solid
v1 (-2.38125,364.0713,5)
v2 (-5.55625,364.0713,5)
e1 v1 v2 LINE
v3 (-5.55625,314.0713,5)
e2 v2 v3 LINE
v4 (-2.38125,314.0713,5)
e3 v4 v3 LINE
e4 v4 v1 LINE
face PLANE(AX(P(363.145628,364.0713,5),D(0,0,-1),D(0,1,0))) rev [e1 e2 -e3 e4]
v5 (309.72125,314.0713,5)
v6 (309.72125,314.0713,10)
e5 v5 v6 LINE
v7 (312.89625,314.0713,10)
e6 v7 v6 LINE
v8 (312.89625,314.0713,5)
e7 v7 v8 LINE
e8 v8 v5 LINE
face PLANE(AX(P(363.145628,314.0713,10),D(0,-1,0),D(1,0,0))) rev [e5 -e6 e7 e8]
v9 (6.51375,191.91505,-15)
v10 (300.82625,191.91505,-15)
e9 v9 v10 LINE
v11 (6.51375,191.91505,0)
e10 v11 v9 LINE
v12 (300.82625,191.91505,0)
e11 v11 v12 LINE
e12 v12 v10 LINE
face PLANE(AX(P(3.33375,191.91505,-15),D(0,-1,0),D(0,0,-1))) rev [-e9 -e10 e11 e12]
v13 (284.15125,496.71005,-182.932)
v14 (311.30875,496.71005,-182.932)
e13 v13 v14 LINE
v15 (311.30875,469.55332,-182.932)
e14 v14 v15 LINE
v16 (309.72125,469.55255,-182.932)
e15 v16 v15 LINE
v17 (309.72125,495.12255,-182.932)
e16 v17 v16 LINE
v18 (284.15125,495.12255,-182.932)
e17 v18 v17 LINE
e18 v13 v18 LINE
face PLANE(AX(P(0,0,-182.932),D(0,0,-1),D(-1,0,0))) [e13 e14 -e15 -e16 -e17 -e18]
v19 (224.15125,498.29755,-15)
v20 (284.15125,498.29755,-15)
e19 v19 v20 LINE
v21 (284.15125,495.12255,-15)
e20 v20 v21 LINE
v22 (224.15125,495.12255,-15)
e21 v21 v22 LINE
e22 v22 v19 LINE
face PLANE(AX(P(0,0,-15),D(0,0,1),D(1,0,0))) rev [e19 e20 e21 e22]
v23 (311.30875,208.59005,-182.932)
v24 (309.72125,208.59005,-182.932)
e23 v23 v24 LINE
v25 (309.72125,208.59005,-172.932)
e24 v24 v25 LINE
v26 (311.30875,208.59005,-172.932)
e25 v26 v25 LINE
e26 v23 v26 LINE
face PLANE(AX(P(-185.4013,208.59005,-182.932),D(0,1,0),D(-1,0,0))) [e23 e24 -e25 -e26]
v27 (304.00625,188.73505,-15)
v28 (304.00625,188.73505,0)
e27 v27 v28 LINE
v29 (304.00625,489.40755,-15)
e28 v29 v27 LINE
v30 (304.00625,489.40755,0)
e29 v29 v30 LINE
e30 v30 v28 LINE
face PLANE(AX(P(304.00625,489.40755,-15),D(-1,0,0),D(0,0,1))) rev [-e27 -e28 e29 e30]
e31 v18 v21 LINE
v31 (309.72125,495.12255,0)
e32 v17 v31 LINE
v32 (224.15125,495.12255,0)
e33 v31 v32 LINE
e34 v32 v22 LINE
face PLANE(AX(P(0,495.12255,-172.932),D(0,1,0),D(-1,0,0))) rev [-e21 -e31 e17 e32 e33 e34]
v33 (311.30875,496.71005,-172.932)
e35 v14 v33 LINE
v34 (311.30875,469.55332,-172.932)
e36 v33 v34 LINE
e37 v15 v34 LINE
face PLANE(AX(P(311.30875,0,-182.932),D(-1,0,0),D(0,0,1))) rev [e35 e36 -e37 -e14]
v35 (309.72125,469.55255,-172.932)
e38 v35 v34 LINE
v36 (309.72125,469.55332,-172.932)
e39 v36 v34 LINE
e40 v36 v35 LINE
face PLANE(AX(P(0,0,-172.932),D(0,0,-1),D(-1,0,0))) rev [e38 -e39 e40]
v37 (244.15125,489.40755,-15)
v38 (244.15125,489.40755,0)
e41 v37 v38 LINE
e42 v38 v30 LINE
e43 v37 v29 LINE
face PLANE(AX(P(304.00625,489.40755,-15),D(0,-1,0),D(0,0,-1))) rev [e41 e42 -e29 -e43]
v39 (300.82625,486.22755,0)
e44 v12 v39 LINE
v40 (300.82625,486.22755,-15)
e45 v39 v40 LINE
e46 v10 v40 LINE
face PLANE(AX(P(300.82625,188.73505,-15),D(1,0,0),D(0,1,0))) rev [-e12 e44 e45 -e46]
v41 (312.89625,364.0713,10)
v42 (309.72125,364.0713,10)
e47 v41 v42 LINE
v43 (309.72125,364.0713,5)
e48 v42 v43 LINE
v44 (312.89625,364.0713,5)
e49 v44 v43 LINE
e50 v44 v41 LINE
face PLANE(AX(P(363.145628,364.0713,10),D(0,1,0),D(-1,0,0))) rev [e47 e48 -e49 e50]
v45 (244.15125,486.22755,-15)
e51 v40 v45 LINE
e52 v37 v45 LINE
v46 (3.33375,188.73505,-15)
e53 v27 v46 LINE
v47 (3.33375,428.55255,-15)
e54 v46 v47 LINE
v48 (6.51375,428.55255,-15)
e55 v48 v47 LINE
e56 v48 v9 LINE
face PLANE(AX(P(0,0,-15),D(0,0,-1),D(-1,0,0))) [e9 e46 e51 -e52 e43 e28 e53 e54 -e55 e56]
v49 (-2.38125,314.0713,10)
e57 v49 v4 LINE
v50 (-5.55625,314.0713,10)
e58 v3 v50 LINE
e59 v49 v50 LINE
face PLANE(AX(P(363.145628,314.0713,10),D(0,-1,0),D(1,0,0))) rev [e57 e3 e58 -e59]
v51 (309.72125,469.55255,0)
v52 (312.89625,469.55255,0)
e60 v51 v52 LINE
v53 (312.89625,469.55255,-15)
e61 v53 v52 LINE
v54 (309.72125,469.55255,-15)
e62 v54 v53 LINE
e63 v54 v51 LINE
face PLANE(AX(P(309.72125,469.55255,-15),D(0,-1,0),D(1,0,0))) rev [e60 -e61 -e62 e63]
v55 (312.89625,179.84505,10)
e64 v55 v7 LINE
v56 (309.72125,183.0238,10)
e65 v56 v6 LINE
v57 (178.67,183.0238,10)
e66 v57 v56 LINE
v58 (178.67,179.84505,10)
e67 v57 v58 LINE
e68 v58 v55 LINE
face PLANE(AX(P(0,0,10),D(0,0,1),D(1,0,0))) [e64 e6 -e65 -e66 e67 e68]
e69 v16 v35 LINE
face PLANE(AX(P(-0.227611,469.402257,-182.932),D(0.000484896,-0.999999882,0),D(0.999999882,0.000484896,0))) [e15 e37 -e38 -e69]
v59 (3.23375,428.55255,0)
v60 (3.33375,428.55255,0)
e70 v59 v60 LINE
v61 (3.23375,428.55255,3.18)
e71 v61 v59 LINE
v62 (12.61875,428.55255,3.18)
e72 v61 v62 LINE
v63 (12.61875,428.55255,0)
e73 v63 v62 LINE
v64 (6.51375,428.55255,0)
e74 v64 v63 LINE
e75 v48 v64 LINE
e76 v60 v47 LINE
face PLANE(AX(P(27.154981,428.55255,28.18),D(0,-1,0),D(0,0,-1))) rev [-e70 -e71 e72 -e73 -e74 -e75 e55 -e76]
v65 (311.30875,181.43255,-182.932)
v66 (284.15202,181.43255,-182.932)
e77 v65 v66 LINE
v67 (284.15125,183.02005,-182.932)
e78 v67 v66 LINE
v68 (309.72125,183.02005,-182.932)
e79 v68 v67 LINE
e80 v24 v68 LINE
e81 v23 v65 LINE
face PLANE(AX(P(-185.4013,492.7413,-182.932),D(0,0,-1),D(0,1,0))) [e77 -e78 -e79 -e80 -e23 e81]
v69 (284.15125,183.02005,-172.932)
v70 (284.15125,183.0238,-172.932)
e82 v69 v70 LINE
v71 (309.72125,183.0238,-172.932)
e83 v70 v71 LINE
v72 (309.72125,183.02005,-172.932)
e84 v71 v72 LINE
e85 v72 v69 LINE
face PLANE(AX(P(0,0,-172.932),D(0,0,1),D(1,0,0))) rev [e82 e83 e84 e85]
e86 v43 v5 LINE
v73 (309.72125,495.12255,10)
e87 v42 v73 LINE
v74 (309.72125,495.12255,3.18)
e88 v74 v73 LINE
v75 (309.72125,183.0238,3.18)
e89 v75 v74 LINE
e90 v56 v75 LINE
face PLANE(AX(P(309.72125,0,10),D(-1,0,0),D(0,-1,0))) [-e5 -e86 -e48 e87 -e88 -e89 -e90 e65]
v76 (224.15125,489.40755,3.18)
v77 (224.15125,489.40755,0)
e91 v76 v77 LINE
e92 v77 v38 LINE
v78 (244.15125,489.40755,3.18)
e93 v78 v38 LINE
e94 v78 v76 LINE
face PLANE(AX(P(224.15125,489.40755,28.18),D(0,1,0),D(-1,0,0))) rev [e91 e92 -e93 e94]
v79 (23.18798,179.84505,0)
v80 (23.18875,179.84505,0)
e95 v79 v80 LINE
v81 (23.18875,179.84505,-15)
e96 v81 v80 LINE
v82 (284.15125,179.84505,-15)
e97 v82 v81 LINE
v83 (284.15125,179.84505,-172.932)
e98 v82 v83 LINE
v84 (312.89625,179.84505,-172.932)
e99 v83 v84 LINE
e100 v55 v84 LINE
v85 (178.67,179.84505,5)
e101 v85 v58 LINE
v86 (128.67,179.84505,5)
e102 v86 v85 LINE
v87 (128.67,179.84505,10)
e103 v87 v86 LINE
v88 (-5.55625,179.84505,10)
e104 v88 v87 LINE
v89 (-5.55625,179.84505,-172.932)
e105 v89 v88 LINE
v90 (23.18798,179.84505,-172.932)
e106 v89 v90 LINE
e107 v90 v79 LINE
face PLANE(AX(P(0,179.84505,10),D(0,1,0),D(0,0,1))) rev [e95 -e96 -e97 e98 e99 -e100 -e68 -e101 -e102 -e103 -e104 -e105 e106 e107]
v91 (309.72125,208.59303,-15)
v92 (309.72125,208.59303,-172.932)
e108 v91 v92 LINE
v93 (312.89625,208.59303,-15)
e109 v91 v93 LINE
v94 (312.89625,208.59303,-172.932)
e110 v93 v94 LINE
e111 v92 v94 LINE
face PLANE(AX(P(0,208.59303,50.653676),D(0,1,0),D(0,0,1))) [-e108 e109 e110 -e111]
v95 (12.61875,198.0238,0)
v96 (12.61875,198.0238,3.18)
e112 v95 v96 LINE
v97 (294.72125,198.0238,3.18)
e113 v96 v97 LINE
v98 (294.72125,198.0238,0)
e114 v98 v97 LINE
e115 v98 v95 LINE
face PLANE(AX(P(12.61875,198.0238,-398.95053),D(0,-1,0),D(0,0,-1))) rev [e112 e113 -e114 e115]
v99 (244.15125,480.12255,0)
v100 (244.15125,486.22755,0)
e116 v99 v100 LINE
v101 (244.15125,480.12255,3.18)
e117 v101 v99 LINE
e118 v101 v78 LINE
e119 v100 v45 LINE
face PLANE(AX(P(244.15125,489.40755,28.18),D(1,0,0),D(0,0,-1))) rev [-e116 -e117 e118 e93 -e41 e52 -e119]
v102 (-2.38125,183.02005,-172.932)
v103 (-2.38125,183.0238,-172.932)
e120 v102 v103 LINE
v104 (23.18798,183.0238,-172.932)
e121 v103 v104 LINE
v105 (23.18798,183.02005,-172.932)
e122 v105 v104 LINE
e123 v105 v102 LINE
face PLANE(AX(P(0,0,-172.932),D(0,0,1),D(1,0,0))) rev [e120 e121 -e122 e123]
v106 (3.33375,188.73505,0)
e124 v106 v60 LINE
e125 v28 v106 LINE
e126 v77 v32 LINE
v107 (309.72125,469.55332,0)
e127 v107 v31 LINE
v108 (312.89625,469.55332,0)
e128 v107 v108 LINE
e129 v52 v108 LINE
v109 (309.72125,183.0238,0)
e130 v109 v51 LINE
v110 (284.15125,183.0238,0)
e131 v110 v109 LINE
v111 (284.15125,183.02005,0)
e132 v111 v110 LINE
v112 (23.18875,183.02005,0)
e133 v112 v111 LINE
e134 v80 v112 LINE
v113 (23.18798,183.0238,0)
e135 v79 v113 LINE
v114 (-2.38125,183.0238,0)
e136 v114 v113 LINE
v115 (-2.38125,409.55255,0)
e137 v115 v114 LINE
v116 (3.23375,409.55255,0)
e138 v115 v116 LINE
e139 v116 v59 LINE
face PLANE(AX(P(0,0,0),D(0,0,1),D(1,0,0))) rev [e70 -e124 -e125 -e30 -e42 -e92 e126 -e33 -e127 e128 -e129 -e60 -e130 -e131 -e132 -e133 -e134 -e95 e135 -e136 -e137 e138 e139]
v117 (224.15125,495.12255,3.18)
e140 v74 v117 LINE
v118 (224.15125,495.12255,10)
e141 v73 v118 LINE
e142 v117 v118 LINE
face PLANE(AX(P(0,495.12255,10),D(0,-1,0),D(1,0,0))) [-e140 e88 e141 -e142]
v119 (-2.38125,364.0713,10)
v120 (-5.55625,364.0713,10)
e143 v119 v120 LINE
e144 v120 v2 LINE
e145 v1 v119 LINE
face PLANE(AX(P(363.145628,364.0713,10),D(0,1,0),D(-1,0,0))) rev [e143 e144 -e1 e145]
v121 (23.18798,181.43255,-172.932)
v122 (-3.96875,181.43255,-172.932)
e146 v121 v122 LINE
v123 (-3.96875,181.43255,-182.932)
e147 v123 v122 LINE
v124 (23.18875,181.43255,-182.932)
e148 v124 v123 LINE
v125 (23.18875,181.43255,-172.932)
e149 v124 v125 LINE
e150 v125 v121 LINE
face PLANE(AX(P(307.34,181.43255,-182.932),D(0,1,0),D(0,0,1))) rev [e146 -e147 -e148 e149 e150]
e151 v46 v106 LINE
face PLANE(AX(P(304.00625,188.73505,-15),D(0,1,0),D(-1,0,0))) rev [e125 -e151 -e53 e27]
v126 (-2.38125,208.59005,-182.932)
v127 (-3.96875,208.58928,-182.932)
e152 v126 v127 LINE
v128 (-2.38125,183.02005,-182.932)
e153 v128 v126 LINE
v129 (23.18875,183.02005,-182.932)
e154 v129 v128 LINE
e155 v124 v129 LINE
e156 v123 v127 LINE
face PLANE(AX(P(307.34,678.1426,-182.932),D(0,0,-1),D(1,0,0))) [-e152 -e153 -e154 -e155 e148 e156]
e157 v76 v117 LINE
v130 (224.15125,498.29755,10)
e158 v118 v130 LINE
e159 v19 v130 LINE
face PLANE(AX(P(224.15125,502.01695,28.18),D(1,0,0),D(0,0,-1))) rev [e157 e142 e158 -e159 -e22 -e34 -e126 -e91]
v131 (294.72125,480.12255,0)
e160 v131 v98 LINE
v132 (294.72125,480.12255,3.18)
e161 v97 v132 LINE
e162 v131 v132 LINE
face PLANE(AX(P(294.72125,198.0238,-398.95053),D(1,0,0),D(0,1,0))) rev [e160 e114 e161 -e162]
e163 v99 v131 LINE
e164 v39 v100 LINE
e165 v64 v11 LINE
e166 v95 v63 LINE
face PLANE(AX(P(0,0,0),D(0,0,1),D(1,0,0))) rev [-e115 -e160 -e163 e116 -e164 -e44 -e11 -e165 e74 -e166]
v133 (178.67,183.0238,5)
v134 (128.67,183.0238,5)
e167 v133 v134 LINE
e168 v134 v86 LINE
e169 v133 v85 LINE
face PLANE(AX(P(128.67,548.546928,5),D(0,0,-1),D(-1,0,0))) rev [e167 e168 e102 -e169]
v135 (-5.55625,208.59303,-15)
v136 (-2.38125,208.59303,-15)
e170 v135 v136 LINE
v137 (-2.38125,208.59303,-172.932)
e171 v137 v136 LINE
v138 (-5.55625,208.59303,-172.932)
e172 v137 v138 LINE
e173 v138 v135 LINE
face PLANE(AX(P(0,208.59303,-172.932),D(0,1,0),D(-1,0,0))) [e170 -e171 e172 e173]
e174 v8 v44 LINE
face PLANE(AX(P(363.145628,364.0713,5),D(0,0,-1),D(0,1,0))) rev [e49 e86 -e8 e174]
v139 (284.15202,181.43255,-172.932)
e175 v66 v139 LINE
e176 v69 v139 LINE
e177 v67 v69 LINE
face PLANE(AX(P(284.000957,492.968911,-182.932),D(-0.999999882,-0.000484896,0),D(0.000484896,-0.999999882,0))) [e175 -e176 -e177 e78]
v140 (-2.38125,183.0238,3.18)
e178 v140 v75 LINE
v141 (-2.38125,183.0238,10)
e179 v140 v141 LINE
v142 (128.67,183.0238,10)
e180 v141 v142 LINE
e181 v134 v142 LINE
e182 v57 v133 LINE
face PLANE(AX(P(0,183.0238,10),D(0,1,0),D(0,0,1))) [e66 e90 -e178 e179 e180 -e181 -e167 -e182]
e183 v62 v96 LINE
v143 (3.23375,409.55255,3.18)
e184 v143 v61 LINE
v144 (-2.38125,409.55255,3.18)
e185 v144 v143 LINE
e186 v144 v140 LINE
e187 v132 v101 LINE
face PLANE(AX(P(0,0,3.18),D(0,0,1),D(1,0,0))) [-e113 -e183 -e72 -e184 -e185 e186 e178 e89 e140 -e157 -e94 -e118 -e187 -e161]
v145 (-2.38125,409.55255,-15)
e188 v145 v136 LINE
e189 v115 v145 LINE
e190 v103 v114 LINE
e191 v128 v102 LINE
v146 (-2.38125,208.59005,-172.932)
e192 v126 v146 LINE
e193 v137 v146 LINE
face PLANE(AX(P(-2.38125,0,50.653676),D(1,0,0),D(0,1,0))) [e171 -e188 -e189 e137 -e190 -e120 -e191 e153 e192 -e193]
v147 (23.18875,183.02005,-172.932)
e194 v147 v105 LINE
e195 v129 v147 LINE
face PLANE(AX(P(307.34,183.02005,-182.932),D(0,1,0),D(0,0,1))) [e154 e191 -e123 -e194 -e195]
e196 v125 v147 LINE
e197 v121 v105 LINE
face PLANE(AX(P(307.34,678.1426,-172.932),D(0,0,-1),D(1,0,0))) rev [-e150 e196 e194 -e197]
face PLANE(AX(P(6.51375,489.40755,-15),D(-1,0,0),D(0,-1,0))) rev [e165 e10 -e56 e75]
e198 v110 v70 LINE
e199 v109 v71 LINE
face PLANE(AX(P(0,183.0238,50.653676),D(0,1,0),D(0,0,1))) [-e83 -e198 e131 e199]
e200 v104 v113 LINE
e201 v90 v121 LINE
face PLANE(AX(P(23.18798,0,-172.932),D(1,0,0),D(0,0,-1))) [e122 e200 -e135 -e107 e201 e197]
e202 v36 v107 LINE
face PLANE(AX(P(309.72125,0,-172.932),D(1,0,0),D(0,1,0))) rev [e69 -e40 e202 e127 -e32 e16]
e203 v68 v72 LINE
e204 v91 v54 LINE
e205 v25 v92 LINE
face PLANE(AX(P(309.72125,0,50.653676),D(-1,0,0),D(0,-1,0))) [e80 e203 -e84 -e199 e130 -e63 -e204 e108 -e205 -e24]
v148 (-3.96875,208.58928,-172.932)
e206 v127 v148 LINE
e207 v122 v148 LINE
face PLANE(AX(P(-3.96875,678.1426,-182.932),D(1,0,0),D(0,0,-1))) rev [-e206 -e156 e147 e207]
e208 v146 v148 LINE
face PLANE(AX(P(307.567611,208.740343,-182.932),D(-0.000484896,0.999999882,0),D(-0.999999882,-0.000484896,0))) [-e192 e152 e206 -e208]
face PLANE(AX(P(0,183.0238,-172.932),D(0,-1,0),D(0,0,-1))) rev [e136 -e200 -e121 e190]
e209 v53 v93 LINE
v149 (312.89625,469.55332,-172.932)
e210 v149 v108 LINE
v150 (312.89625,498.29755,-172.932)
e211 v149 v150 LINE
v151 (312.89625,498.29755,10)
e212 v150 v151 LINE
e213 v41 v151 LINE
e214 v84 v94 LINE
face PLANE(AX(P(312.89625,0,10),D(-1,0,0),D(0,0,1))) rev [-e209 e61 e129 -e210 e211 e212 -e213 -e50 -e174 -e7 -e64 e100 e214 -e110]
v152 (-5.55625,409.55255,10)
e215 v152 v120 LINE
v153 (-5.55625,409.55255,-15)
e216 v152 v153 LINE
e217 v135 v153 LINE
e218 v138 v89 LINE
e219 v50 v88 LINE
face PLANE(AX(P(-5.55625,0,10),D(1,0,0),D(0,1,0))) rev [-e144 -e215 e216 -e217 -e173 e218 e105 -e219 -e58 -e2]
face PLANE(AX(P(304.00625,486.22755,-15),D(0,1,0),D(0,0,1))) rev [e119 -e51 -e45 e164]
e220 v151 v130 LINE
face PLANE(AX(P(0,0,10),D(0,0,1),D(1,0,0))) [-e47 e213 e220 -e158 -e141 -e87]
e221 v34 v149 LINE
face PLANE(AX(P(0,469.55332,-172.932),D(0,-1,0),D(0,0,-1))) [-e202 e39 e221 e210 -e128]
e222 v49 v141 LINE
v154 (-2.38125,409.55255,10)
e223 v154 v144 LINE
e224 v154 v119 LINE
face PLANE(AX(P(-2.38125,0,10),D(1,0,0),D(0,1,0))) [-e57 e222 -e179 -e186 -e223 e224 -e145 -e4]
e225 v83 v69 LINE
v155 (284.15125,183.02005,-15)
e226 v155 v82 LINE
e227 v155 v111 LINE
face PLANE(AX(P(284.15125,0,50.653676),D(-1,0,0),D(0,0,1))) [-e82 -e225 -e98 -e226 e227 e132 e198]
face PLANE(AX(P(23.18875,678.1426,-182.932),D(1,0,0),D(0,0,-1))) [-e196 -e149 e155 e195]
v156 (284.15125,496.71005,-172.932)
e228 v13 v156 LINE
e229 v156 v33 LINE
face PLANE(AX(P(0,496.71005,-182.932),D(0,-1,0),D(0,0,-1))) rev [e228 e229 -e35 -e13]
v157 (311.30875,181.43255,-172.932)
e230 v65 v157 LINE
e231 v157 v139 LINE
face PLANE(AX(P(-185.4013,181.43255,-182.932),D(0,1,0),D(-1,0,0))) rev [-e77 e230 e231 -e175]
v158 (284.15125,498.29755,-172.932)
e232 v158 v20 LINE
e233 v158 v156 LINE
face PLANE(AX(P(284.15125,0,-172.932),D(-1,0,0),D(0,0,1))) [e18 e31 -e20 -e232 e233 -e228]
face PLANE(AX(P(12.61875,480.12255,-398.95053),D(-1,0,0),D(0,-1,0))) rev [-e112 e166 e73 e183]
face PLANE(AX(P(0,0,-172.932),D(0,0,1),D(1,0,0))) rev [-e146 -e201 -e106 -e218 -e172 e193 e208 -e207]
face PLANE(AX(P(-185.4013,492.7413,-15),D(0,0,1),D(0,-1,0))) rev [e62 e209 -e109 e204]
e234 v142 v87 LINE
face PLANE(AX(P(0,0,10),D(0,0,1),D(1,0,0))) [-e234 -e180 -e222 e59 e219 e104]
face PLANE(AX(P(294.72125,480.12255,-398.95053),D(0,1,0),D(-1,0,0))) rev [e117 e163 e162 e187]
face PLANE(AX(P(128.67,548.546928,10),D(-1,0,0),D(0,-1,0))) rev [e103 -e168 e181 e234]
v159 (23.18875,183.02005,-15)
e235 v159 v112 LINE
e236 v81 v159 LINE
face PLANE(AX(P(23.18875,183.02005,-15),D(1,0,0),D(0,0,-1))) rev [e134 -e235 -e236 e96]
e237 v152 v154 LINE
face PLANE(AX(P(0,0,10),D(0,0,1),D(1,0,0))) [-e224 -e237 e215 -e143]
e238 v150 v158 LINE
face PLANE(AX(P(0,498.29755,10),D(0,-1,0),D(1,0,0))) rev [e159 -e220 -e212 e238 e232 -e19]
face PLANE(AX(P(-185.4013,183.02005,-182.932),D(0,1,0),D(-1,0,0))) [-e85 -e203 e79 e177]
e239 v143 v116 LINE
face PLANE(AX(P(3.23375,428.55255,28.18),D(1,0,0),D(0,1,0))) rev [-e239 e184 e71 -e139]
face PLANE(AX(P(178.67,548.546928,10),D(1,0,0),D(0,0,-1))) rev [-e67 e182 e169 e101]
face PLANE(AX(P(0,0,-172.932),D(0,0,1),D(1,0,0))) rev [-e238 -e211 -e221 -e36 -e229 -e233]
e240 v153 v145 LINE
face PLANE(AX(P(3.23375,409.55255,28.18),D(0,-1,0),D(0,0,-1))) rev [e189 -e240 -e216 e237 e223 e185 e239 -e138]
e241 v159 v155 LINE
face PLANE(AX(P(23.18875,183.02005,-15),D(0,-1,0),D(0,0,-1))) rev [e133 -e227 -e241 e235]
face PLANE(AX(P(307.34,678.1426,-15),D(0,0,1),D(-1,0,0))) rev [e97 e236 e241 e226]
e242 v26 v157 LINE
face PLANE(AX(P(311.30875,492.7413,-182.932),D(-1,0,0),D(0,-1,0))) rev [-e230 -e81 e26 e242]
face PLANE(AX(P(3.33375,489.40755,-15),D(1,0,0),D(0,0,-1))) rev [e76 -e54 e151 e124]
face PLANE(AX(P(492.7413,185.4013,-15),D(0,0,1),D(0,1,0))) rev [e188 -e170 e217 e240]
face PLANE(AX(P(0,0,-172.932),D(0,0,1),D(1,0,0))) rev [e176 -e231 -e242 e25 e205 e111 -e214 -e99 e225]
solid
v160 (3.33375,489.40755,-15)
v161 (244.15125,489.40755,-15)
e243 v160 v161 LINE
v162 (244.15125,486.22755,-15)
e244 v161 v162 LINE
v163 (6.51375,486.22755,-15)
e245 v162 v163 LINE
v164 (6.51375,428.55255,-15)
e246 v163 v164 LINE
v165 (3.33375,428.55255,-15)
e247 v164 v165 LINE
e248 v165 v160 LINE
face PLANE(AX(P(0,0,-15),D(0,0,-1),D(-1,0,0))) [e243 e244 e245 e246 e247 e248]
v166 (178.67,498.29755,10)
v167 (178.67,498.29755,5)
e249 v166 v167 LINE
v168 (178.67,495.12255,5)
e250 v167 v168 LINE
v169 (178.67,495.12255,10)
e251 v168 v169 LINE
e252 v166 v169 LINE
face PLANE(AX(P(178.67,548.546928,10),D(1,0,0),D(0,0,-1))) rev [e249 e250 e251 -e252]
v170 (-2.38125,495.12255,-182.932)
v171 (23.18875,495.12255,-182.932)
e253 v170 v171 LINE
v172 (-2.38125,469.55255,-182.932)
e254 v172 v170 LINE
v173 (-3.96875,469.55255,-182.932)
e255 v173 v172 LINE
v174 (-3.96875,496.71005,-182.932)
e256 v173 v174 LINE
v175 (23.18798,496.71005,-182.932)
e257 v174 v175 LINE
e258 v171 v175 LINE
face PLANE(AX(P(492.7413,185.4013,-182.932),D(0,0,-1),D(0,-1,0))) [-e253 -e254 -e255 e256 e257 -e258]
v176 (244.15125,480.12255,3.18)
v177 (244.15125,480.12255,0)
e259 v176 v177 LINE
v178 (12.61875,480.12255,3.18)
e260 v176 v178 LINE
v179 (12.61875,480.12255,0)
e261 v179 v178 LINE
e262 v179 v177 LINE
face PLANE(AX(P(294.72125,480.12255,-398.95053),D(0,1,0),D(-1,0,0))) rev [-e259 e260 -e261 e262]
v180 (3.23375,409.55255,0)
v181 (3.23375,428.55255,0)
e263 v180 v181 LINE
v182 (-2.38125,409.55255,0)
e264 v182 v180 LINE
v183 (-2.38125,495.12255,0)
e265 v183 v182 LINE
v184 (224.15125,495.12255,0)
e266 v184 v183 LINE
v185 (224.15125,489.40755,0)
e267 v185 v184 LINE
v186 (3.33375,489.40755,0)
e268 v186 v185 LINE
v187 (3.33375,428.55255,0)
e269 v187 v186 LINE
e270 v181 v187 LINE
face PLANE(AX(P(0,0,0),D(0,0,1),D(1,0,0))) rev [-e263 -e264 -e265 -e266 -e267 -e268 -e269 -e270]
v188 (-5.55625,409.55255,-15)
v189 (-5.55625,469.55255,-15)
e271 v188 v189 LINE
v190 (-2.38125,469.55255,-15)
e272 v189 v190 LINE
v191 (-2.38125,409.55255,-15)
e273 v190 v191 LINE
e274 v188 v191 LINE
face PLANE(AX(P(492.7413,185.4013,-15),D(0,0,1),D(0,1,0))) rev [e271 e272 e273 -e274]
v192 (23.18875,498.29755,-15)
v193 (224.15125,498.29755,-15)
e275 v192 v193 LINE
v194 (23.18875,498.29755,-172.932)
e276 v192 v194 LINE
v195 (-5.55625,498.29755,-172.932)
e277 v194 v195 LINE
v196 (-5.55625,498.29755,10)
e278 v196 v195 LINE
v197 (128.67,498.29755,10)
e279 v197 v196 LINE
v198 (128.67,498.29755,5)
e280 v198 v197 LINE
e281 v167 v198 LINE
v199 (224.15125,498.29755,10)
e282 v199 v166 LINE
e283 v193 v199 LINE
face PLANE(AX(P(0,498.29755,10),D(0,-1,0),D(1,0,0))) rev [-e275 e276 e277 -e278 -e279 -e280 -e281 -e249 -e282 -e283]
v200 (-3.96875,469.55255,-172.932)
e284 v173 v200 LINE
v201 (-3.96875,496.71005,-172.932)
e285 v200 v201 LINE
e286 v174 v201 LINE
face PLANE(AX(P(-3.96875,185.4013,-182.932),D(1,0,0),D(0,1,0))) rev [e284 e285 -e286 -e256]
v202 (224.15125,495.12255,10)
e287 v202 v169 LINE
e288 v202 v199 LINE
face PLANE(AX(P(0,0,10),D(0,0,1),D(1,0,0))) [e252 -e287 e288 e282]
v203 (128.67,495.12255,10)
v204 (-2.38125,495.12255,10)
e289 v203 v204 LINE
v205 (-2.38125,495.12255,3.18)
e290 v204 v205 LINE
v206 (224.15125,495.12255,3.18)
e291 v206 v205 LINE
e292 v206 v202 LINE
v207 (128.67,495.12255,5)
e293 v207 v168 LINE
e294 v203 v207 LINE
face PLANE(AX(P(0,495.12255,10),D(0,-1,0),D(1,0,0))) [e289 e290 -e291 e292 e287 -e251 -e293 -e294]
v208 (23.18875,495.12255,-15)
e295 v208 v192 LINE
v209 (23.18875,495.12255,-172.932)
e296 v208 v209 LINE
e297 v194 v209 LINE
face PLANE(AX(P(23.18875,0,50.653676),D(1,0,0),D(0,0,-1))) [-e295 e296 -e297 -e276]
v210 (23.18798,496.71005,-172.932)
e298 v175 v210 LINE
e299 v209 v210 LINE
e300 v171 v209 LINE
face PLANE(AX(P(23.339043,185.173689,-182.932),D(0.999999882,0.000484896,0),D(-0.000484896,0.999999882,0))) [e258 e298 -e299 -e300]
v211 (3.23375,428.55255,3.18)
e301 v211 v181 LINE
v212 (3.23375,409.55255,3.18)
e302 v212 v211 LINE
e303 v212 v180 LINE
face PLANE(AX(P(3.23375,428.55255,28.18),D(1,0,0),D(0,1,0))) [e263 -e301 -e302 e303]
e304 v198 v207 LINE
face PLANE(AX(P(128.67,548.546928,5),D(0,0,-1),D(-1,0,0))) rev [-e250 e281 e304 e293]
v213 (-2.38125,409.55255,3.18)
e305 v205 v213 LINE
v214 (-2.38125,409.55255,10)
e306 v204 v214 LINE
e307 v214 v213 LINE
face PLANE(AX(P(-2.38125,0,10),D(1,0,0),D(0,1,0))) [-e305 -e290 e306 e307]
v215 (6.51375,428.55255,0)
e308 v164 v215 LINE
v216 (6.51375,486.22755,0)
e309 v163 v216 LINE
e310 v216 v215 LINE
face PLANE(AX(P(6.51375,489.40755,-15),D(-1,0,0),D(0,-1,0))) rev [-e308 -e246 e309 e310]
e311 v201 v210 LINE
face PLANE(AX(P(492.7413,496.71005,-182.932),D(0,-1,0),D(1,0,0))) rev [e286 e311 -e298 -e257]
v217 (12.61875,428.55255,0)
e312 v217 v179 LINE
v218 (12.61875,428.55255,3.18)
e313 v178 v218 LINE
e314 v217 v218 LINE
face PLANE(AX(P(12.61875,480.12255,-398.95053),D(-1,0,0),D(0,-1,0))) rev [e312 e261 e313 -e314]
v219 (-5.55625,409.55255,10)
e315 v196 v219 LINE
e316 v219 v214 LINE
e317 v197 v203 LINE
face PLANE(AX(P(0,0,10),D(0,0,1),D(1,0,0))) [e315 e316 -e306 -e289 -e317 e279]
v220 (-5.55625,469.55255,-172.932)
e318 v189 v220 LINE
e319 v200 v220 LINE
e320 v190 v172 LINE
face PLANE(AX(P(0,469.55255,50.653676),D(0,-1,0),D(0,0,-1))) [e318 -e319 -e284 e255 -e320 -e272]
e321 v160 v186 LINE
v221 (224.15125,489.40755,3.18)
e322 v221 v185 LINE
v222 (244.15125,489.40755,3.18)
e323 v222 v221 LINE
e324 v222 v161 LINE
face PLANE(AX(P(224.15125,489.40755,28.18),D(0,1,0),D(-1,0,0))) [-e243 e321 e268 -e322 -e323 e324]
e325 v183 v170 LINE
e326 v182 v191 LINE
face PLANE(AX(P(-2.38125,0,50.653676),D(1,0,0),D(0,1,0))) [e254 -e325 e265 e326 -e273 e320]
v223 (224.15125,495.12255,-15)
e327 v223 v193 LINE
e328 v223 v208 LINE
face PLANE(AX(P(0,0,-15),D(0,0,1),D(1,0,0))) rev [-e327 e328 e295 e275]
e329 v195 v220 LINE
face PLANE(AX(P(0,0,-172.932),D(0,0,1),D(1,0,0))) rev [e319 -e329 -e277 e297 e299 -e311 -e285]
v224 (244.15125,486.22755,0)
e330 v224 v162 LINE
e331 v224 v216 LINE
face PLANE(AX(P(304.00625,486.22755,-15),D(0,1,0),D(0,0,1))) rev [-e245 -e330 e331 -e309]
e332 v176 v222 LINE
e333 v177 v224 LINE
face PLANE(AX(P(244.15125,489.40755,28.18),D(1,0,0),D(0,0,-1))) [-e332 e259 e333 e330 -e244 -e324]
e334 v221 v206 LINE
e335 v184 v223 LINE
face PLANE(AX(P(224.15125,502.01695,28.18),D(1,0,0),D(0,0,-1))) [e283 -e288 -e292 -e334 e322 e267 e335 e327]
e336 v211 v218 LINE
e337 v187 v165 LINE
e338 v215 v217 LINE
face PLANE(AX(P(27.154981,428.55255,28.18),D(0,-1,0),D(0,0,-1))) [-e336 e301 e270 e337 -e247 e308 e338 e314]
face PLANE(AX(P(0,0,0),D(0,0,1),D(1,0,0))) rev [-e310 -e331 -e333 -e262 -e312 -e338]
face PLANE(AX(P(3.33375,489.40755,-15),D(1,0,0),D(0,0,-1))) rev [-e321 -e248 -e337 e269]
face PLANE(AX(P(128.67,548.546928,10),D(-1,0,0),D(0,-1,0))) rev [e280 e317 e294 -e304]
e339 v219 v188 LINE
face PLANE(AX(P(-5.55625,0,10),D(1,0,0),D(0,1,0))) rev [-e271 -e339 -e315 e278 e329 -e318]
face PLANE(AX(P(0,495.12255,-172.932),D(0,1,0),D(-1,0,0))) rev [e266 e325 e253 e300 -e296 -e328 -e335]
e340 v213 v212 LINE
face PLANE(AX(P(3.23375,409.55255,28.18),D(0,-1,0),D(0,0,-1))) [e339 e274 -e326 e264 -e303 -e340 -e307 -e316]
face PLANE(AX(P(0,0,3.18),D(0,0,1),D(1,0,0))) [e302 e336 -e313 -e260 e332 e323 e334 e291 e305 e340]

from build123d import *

# Parameters (mm, degrees)
SKETCH1_W                = 260.9625
SKETCH1_H                = 3.175
BOSS_EXTRUDE1_DEPTH      = 10
SKETCH1_W_2              = 3.175
SKETCH1_H_2              = 260.959519773
BOSS_EXTRUDE1_2_DEPTH    = 10
SKETCH1_H_3              = 260.960289546
BOSS_EXTRUDE1_3_DEPTH    = 10
SKETCH1_W_3              = 260.963269773
SKETCH1_H_4              = 3.17875
BOSS_EXTRUDE1_4_DEPTH    = 10
SKETCH1_2_W              = 312.1025
SKETCH1_2_H              = 312.09875
BOSS_EXTRUDE2_DEPTH      = 3.18
BOSS_EXTRUDE4_DEPTH      = 10
BOSS_EXTRUDE4_DEPTH_BACK = 172.932
SKETCH2_W                = 282.1025
SKETCH2_H                = 282.09875
CUT_EXTRUDE1_DEPTH       = 3.18
CUT_EXTRUDE2_START       = -318.4525
SKETCH4_W                = 5
SKETCH4_H                = 50
CUT_EXTRUDE2_DEPTH       = 318.4525
CUT_EXTRUDE3_START       = -318.4525
SKETCH5_W                = 50
SKETCH5_H                = 5
CUT_EXTRUDE3_DEPTH       = 318.4525
SKETCH6_W                = 300.6725
SKETCH6_H                = 3.18
SKETCH6_W_2              = 260.9625
SKETCH6_H_2              = 3.175
BOSS_EXTRUDE5_DEPTH      = 15
CIRPATTERN11_COUNT       = 4
BOSS_EXTRUDE9_DEPTH      = 10
CIRPATTERN16_COUNT       = 4
SPLIT1_START             = -15
SPLIT1_DEPTH             = 18.18
SPLIT1_START_2           = -172.932
SPLIT1_2_DEPTH           = 182.932
SPLIT1_3_DEPTH           = 3.18
SPLIT1_START_3           = 3.18
SPLIT1_4_OUTLINE_W       = 45.48125
SPLIT1_4_OUTLINE_H       = 3.175
SPLIT1_4_OUTLINE_W_2     = 105.48125
SPLIT1_4_OUTLINE_W_3     = 3.175
SPLIT1_4_OUTLINE_H_2     = 60
SPLIT1_4_DEPTH           = 6.82
SPLIT1_START_4           = -182.932
SPLIT1_5_DEPTH           = 10
SPLIT1_6_OUTLINE_W       = 50
SPLIT1_6_OUTLINE_H       = 3.175
SPLIT1_6_DEPTH           = 1.82
SPLIT1_START_5           = -5.55625
SPLIT1_7_DEPTH           = 249.7075
SPLIT1_8_DEPTH           = 229.7075
SPLIT1_9_OUTLINE_W       = 19
SPLIT1_9_OUTLINE_H       = 18.18
SPLIT1_9_DEPTH           = 8.79


# Read off the part's stored shape, not the designer's step: Split1
with BuildPart() as part:
    # Sketch1 → Boss-Extrude1 (new body)
    with BuildSketch(Plane.XY):
        with Locations((153.67, 496.71005)):
            Rectangle(SKETCH1_W, SKETCH1_H)
    extrude(amount=BOSS_EXTRUDE1_DEPTH)



with BuildPart() as body_2:
    # Sketch1 → Boss-Extrude1 2 (new body)
    with BuildSketch(Plane.XY):
        with Locations((-3.96875, 339.072790114)):
            Rectangle(SKETCH1_W_2, SKETCH1_H_2)
    extrude(amount=BOSS_EXTRUDE1_2_DEPTH)


with BuildPart() as body_3:
    # Sketch1 → Boss-Extrude1 3 (new body)
    with BuildSketch(Plane.XY):
        with Locations((311.30875, 339.073175)):
            Rectangle(SKETCH1_W_2, SKETCH1_H_3)
    extrude(amount=BOSS_EXTRUDE1_3_DEPTH)


with BuildPart() as body_4:
    # Sketch1 → Boss-Extrude1 4 (new body)
    with BuildSketch(Plane.XY):
        with Locations((153.669615114, 181.434425)):
            Rectangle(SKETCH1_W_3, SKETCH1_H_4)
    extrude(amount=BOSS_EXTRUDE1_4_DEPTH)


with BuildPart() as part_1:
    add(part.part)

    add(body_2.part)  # Boss-Extrude2 merges body 2

    add(body_3.part)  # Boss-Extrude2 merges body 3

    add(body_4.part)  # Boss-Extrude2 merges body 4
    # Sketch1<2> → Boss-Extrude2 (add)
    with BuildSketch(Plane.XY):
        with Locations((153.67, 339.073175)):
            Rectangle(SKETCH1_2_W, SKETCH1_2_H)
    extrude(amount=BOSS_EXTRUDE2_DEPTH)

    # Sketch1<5> → Boss-Extrude4 (add, two sides: drawn at the far end of the back side and taken through both)
    with BuildSketch(Plane.XY.offset(-BOSS_EXTRUDE4_DEPTH_BACK)):
        Polygon((284.15125, 495.12255), (309.72125, 495.12255), (309.72125, 469.553319773), (312.89625, 469.553319773), (312.89625, 498.29755), (284.15125, 498.29755), align=None)
        Polygon((-2.38125, 495.12255), (23.18875, 495.12255), (23.18875, 498.29755), (-5.55625, 498.29755), (-5.55625, 469.55255), (-2.38125, 469.55255), align=None)
        Polygon((-2.38125, 183.0238), (-2.38125, 208.593030227), (-5.55625, 208.593030227), (-5.55625, 179.84505), (23.187980227, 179.84505), (23.187980227, 183.0238), align=None)
        Polygon((312.89625, 208.593030227), (309.72125, 208.593030227), (309.72125, 183.0238), (284.15125, 183.0238), (284.15125, 179.84505), (312.89625, 179.84505), align=None)
    extrude(amount=BOSS_EXTRUDE4_DEPTH + BOSS_EXTRUDE4_DEPTH_BACK)

    # Sketch2 → Cut-Extrude1 (cut)
    with BuildSketch(Plane.XY.offset(3.18)):
        with Locations((153.67, 339.073175)):
            Rectangle(SKETCH2_W, SKETCH2_H)
    extrude(amount=-CUT_EXTRUDE1_DEPTH, mode=Mode.SUBTRACT)

    # Sketch4 → Cut-Extrude2 (cut)
    with BuildSketch(Plane.ZY.offset(5.55625).offset(CUT_EXTRUDE2_START)):
        with Locations((7.5, 339.0713)):
            Rectangle(SKETCH4_W, SKETCH4_H)
    extrude(amount=CUT_EXTRUDE2_DEPTH, mode=Mode.SUBTRACT)

    # Sketch5 → Cut-Extrude3 (cut)
    with BuildSketch(Plane.XZ.offset(-179.84505).offset(CUT_EXTRUDE3_START)):
        with Locations((153.67, 7.5)):
            Rectangle(SKETCH5_W, SKETCH5_H)
    extrude(amount=CUT_EXTRUDE3_DEPTH, mode=Mode.SUBTRACT)

    # Sketch6 → Boss-Extrude5 (add)
    with BuildSketch(Plane(origin=(0, 0, 0), x_dir=(-1, 0, 0), z_dir=(0, 0, -1))):
        with Locations((-153.67, 487.81755)):
            Rectangle(SKETCH6_W, SKETCH6_H)
        with Locations((-153.67, 496.71005)):
            Rectangle(SKETCH6_W_2, SKETCH6_H_2)
    boss_extrude5 = extrude(amount=BOSS_EXTRUDE5_DEPTH)

    # CirPattern11: Boss-Extrude5 ×4 about axis
    cirpattern11_axis = Axis((153.67, 339.0713, 0), (0, 0, 1))
    for i in range(1, CIRPATTERN11_COUNT):
        add(boss_extrude5.rotate(cirpattern11_axis, i * 360 / CIRPATTERN11_COUNT))

    # Sketch12 → Boss-Extrude9 (add)
    with BuildSketch(Plane(origin=(0, 0, -172.932), x_dir=(-1, 0, 0), z_dir=(0, 0, -1))):
        Polygon((-309.72125, 469.55255), (-311.30875, 469.553319773), (-311.30875, 496.71005), (-284.15125, 496.71005), (-284.15125, 495.12255), (-309.72125, 495.12255), align=None)
    boss_extrude9 = extrude(amount=BOSS_EXTRUDE9_DEPTH)

    # CirPattern16: Boss-Extrude9 ×4 about axis
    cirpattern16_axis = Axis((153.67, 339.0713, 0), (0, 0, 1))
    for i in range(1, CIRPATTERN16_COUNT):
        add(boss_extrude9.rotate(cirpattern16_axis, i * 360 / CIRPATTERN16_COUNT))

    # Split1 7 outline → Split1 7 (cut)
    with BuildSketch(Plane.YZ.offset(SPLIT1_START_5)):
        Polygon((489.40755, 0), (489.40755, 3.18), (495.12255, 3.18), (495.12255, 10), (409.55255, 10), (409.55255, 3.18), (428.55255, 3.18), (428.55255, -15), (469.55255, -15), (469.55255, -182.932), (496.71005, -182.932), (496.71005, -172.932), (498.29755, -172.932), (498.29755, -15), (495.12255, -15), (495.12255, 0), align=None)
    extrude(amount=SPLIT1_7_DEPTH, mode=Mode.SUBTRACT)

    # Split1 8 outline → Split1 8 (cut)
    with BuildSketch(Plane.YZ.offset(SPLIT1_START_5)):
        Polygon((489.40755, 3.18), (489.40755, 0), (495.12255, 0), (495.12255, -15), (498.29755, -15), (498.29755, 10), (495.12255, 10), (495.12255, 3.18), align=None)
    extrude(amount=SPLIT1_8_DEPTH, mode=Mode.SUBTRACT)

    # Split1 9 outline → Split1 9 (cut)
    with BuildSketch(Plane.YZ.offset(SPLIT1_START_5)):
        with Locations((419.05255, -5.91)):
            Rectangle(SPLIT1_9_OUTLINE_W, SPLIT1_9_OUTLINE_H)
    extrude(amount=SPLIT1_9_DEPTH, mode=Mode.SUBTRACT)


with BuildPart() as body_2_2:
    # Split1 outline → Split1 (new body)
    with BuildSketch(Plane.XY.offset(SPLIT1_START)):
        Polygon((6.51375, 486.22755), (244.15125, 486.22755), (244.15125, 489.40755), (3.33375, 489.40755), (3.33375, 428.55255), (6.51375, 428.55255), align=None)
        Polygon((224.15125, 495.12255), (224.15125, 498.29755), (-5.55625, 498.29755), (-5.55625, 409.55255), (-2.38125, 409.55255), (-2.38125, 495.12255), align=None)
    extrude(amount=SPLIT1_DEPTH)

    # Split1 2 outline → Split1 2 (add)
    with BuildSketch(Plane.XY.offset(SPLIT1_START_2)):
        Polygon((-2.38125, 495.12255), (23.18875, 495.12255), (23.18875, 498.29755), (-5.55625, 498.29755), (-5.55625, 469.55255), (-2.38125, 469.55255), align=None)
    extrude(amount=SPLIT1_2_DEPTH)

    # Split1 3 outline → Split1 3 (add)
    with BuildSketch(Plane.XY):
        Polygon((12.61875, 480.12255), (244.15125, 480.12255), (244.15125, 486.22755), (6.51375, 486.22755), (6.51375, 428.55255), (12.61875, 428.55255), align=None)
        Polygon((3.33375, 489.40755), (224.15125, 489.40755), (224.15125, 495.12255), (-2.38125, 495.12255), (-2.38125, 409.55255), (3.23375, 409.55255), (3.23375, 428.55255), (3.33375, 428.55255), align=None)
    extrude(amount=SPLIT1_3_DEPTH)

    # Split1 4 outline → Split1 4 (add)
    with BuildSketch(Plane.XY.offset(SPLIT1_START_3)):
        with Locations((201.410625, 496.71005)):
            Rectangle(SPLIT1_4_OUTLINE_W, SPLIT1_4_OUTLINE_H)
        with Locations((75.929375, 496.71005)):
            Rectangle(SPLIT1_4_OUTLINE_W_2, SPLIT1_4_OUTLINE_H)
        with Locations((-3.96875, 439.55255)):
            Rectangle(SPLIT1_4_OUTLINE_W_3, SPLIT1_4_OUTLINE_H_2)
    extrude(amount=SPLIT1_4_DEPTH)

    # Split1 5 outline → Split1 5 (add)
    with BuildSketch(Plane.XY.offset(SPLIT1_START_4)):
        Polygon((-2.38125, 495.12255), (23.18875, 495.12255), (23.187980227, 496.71005), (-3.96875, 496.71005), (-3.96875, 469.55255), (-2.38125, 469.55255), align=None)
    extrude(amount=SPLIT1_5_DEPTH)

    # Split1 6 outline → Split1 6 (add)
    with BuildSketch(Plane.XY.offset(SPLIT1_START_3)):
        with Locations((153.67, 496.71005)):
            Rectangle(SPLIT1_6_OUTLINE_W, SPLIT1_6_OUTLINE_H)
    extrude(amount=SPLIT1_6_DEPTH)


solid = Compound([part_1.part, body_2_2.part])
